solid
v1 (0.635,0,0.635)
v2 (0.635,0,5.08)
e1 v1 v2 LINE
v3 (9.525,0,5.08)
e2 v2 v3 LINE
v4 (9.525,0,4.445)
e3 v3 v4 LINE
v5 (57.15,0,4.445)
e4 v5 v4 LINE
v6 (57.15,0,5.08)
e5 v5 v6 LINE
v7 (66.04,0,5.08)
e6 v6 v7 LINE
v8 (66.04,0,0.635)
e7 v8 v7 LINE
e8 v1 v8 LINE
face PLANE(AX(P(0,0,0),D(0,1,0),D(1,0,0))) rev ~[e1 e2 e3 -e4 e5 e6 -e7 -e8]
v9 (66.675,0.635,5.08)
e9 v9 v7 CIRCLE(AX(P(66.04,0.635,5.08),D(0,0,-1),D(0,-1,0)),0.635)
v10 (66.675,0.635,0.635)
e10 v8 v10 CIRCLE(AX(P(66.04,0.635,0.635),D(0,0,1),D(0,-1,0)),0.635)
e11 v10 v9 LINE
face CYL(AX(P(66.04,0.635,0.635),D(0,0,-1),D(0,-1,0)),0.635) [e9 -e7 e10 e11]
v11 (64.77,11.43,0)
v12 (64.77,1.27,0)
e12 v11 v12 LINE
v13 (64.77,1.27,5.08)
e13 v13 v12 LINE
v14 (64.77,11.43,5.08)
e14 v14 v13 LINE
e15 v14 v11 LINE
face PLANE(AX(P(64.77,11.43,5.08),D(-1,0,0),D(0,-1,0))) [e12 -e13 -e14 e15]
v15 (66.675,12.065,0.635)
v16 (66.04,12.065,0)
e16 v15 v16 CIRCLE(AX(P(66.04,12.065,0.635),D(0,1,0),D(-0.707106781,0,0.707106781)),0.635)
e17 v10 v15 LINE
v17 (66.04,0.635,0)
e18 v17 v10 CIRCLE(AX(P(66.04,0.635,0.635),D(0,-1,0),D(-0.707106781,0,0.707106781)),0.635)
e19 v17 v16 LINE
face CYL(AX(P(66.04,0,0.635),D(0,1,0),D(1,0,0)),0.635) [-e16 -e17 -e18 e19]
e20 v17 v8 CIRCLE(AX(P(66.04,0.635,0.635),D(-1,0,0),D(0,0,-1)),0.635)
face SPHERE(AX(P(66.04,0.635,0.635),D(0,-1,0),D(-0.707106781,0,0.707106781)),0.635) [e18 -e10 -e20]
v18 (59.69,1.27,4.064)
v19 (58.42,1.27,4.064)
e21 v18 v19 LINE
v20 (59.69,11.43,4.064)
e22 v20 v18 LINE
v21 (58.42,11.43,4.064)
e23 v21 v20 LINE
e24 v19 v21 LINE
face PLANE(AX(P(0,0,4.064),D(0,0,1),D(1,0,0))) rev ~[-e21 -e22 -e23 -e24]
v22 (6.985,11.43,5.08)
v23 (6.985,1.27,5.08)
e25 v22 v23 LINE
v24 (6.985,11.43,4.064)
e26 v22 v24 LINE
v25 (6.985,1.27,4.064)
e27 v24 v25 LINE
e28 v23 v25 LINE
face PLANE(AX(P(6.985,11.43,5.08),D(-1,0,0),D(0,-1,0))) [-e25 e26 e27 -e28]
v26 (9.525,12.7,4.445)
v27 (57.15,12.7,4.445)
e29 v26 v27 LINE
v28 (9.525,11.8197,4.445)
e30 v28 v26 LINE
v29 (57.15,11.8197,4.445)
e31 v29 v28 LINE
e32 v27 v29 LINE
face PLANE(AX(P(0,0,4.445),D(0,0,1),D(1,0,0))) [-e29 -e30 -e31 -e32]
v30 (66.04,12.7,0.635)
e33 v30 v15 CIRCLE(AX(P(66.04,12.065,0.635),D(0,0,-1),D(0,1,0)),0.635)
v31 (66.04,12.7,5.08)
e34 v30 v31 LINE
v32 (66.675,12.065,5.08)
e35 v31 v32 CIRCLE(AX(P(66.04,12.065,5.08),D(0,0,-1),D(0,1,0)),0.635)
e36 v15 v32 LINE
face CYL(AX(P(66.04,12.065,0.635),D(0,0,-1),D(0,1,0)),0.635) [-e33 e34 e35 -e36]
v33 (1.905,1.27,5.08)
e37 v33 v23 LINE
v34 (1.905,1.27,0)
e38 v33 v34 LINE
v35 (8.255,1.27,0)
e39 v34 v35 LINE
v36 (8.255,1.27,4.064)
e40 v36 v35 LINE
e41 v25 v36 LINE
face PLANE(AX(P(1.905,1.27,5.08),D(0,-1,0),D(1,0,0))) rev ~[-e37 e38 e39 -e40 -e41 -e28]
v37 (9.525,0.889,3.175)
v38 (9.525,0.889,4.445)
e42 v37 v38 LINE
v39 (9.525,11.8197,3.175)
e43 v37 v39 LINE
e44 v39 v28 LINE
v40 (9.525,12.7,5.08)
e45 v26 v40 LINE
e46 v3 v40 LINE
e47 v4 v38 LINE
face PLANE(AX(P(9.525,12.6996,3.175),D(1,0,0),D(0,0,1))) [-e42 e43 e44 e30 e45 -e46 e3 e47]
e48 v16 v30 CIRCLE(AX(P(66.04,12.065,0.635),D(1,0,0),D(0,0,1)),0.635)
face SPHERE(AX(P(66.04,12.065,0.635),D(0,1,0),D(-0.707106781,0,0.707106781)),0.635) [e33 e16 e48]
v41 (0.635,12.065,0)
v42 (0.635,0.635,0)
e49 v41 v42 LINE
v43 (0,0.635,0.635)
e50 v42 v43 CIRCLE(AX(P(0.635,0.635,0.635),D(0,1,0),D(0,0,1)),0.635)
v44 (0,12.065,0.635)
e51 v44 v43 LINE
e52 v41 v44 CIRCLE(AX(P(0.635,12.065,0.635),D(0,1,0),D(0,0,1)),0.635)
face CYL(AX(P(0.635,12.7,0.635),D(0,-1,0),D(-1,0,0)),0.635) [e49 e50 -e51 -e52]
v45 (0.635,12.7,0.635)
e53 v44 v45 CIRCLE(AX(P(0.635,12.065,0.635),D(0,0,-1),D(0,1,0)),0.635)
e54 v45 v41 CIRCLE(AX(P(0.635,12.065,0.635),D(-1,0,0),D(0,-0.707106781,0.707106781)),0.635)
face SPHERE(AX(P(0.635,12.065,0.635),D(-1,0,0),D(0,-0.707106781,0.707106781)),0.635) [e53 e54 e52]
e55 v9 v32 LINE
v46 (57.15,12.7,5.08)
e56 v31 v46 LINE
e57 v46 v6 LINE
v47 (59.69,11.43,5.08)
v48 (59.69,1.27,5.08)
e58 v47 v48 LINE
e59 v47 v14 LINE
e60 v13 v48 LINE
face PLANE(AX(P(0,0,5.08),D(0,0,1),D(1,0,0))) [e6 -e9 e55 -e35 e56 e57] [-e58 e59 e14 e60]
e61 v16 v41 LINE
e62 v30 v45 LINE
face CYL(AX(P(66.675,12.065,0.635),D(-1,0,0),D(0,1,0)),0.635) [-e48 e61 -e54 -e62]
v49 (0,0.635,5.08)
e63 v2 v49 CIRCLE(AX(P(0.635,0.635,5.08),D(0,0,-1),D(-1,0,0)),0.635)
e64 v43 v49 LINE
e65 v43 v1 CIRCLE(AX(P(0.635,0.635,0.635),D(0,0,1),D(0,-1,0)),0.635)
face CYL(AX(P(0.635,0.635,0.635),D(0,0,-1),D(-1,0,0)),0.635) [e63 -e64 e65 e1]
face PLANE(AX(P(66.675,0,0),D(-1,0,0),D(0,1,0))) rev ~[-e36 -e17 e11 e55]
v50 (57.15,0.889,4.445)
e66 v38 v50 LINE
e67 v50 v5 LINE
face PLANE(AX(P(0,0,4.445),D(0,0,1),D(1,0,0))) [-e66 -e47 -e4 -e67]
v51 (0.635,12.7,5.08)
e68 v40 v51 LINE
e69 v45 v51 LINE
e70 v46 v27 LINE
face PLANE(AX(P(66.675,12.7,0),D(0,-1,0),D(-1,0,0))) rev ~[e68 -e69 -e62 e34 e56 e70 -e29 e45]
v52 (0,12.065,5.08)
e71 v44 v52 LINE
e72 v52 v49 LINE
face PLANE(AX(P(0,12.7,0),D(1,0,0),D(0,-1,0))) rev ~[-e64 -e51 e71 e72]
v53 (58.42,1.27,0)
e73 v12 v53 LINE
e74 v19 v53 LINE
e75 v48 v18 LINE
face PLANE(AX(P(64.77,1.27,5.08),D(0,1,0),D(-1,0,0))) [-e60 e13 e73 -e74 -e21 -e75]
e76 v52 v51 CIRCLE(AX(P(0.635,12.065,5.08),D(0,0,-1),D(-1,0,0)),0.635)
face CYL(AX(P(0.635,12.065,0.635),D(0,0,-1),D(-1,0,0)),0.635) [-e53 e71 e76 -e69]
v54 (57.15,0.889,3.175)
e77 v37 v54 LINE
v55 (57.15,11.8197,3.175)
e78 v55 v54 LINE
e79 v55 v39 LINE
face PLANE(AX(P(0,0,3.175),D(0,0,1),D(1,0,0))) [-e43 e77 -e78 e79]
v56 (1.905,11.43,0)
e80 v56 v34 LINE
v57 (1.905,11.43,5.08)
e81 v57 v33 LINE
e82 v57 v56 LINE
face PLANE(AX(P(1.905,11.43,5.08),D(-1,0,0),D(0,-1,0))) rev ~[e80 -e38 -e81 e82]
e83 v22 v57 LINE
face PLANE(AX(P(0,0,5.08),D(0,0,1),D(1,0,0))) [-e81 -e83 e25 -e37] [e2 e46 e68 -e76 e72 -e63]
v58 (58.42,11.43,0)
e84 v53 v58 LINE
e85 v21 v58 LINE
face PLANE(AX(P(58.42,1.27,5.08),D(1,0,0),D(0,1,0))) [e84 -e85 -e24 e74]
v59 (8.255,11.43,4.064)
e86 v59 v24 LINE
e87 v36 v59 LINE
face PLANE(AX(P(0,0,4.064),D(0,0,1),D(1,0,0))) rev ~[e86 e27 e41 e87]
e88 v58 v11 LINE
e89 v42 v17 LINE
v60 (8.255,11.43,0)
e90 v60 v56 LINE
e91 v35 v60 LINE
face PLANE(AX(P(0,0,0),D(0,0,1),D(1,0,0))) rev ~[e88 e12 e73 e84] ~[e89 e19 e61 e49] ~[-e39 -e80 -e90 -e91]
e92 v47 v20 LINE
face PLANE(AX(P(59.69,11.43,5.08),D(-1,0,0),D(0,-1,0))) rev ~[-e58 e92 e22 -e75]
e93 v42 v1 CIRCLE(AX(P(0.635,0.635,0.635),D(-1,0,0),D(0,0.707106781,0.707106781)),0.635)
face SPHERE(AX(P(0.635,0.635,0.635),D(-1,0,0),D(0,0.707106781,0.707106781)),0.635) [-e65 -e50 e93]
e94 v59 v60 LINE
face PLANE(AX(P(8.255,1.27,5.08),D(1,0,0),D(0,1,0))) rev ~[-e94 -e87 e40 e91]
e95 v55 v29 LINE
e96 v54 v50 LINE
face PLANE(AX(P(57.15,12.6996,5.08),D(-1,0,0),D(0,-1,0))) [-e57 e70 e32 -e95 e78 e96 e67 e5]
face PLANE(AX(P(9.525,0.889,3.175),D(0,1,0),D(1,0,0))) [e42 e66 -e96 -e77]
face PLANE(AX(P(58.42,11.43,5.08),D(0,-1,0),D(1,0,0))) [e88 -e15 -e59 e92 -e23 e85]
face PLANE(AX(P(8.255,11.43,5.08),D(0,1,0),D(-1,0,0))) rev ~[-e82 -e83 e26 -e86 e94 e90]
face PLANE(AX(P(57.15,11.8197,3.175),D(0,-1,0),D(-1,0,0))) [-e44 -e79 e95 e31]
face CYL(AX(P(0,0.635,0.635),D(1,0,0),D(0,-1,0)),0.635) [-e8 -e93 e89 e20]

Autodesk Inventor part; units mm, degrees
ref_plane "YZ Plane" through (0, 0, 0) normal (1, 0, 0) x (0, 1, 0)
ref_plane "XZ Plane" through (0, 0, 0) normal (0, 1, 0) x (-1, 0, 0)
ref_plane "XY Plane" through (0, 0, 0) normal (0, 0, 1) x (1, 0, 0)
sketch "Sketch1" plane through (0, 0, 0) normal (0, 0, 1) x (1, 0, 0)
  line L0 (0, 0) -> (66.675, 0)
  line L1 (66.675, 0) -> (66.675, 12.7)
  line L2 (66.675, 12.7) -> (0, 12.7)
  line L3 (0, 12.7) -> (0, 0)
  dimension "d0" = 66.675
  dimension "d1" = 12.7
extrude "Extrusion1" add sketch "Sketch1" along normal blind 5.08
fillet "Fillet1" radius 0.635 4 edges at (33.3375, 12.7, 0) (66.675, 6.35, 0) (33.3375, 0, 0) (0, 6.35, 0)
fillet "Fillet2" radius 0.635 8 edges at (66.489, 12.514, 0.186) (66.675, 12.7, 2.8575) (66.489, 0.186, 0.186) (66.675, 0, 2.8575) (0.186, 12.514, 0.186) (0, 12.7, 2.8575) (0.186, 0.186, 0.186) (0, 0, 2.8575)
sketch "Sketch2" plane through (0, 0, 5.08) normal (0, 0, 1) x (1, 0, 0)
  line L0 (9.525, 12.6996) -> (57.15, 12.6996)
  line L1 (57.15, 12.6996) -> (57.15, -0.0004)
  line L2 (57.15, -0.0004) -> (9.525, -0.0004)
  line L3 (9.525, -0.0004) -> (9.525, 12.6996)
  line L4 (66.675, 0.635) -> (66.675, 12.065) projected
  point P0 (0, 0)
  dimension "d6" = 47.625
  dimension "d7" = 12.7
  dimension "d8" = 9.525
extrude "Extrusion2" cut sketch "Sketch2" against normal blind 1.905
sketch "Sketch3" plane through (9.525, 12.6996, 5.08) normal (0, -1, 0) x (1, 0, 0)
  line L0 (0, -1.905) -> (0, 0) projected
  line L1 (47.625, -1.905) -> (0, -1.905) projected
  line L2 (0, 0) -> (47.625, 0)
  line L3 (47.625, 0) -> (47.625, -1.905)
  line L4 (47.625, -1.905) -> (0, -1.905)
  line L5 (0, -1.905) -> (0, 0)
  point P0 (-9.525, -5.08)
extrude "Extrusion3" cut sketch "Sketch3" against normal blind 0.635
sketch "Sketch4" plane through (0, 0, 5.08) normal (0, 0, 1) x (1, 0, 0)
  line L0 (0.635, 0.635) -> (66.04, 0.635) projected
  line L1 (58.42, 11.43) -> (59.69, 11.43)
  line L2 (59.69, 11.43) -> (59.69, 1.27)
  line L3 (59.69, 1.27) -> (58.42, 1.27)
  line L4 (58.42, 1.27) -> (58.42, 11.43)
  line L5 (66.04, 12.7) -> (0.635, 12.7) projected
  line L6 (57.15, 12.7) -> (57.15, 0) projected
  line L7 (57.15, 0) -> (66.04, 0) projected
  point P0 (0, 0)
  point P1 (53.975, 6.9846)
  dimension "d13" = 1.27
  dimension "d23" = 1.27
  dimension "d24" = 1.27
  dimension "d42" = 1.27
sketch "Sketch5" plane through (0, 0, 5.08) normal (0, 0, 1) x (1, 0, 0)
  line L0 (66.04, 12.065) -> (0.635, 12.065) projected
  line L1 (0.635, 0.635) -> (66.04, 0.635) projected
  line L2 (58.42, 11.43) -> (64.77, 11.43)
  line L3 (64.77, 11.43) -> (64.77, 1.27)
  line L4 (64.77, 1.27) -> (58.42, 1.27)
  line L5 (58.42, 1.27) -> (58.42, 11.43)
  line L6 (57.15, 12.7) -> (57.15, 0) projected
  line L7 (66.04, 12.7) -> (57.15, 12.7) projected
  line L8 (57.15, 0) -> (66.04, 0) projected
  point P0 (0, 0)
  point P1 (53.975, 6.9846)
  dimension "d14" = 6.35
  dimension "d25" = 1.27
  dimension "d43" = 1.27
  dimension "d44" = 1.27
extrude "Extrusion4" cut sketch "Sketch5" against normal through all
extrude "Extrusion5" add sketch "Sketch4" against normal blind 1.016
sketch "Sketch6" plane through (0, 0, 5.08) normal (0, 0, 1) x (1, 0, 0)
  line L0 (57.15, 12.7) -> (57.15, 0) projected
  line L1 (55.245, 0.635) -> (55.245, 12.065) projected
  line L2 (66.04, 12.065) -> (0.635, 12.065) projected
  line L3 (8.255, 11.43) -> (6.985, 11.43)
  line L4 (6.985, 11.43) -> (6.985, 1.27)
  line L5 (6.985, 1.27) -> (8.255, 1.27)
  line L6 (8.255, 1.27) -> (8.255, 11.43)
  line L7 (9.525, 0) -> (9.525, 12.7) projected
  line L8 (0.635, 0.635) -> (66.04, 0.635) projected
  line L9 (9.525, 12.7) -> (0.635, 12.7) projected
  line L10 (0.635, 0) -> (9.525, 0) projected
  point P0 (0, 0)
  point P1 (53.975, 6.9846)
  point P2 (6.35, 6.9846)
  dimension "d20" = 1.27
  dimension "d22" = 1.27
  dimension "d45" = 1.27
  dimension "d46" = 1.27
sketch "Sketch7" plane through (0, 0, 5.08) normal (0, 0, 1) x (1, 0, 0)
  line L0 (66.04, 12.065) -> (0.635, 12.065) projected
  line L1 (8.255, 11.43) -> (1.905, 11.43)
  line L2 (1.905, 11.43) -> (1.905, 1.27)
  line L3 (1.905, 1.27) -> (8.255, 1.27)
  line L4 (8.255, 1.27) -> (8.255, 11.43)
  line L5 (9.525, 0) -> (9.525, 12.7) projected
  line L6 (0.635, 0.635) -> (66.04, 0.635) projected
  line L7 (9.525, 12.7) -> (0.635, 12.7) projected
  line L8 (0.635, 0) -> (9.525, 0) projected
  point P0 (0, 0)
  point P1 (55.245, 12.065)
  point P2 (6.35, 6.9846)
  point P3 (55.245, 0.635)
  dimension "d26" = 6.35
  dimension "d28" = 1.27
  dimension "d47" = 1.27
  dimension "d48" = 1.27
extrude "Extrusion6" cut sketch "Sketch7" against normal through all
extrude "Extrusion7" add sketch "Sketch6" against normal blind 1.016 contours L6 L5 L4 L3
sketch "Sketch9" plane through (0, 0, 3.175) normal (0, 0, 1) x (1, 0, 0)
  line L0 (9.525, 0) -> (9.525, 12.7) projected
  line L1 (57.15, 12.7) -> (57.15, 0) projected
  line L2 (9.525, 12.7) -> (57.15, 12.7)
  line L3 (57.15, 12.7) -> (57.15, 11.8197)
  line L4 (57.15, 11.8197) -> (9.525, 11.8197)
  line L5 (9.525, 11.8197) -> (9.525, 12.7)
  line L6 (66.04, 0) -> (0.635, 0) projected
  line L7 (57.15, 0) -> (9.525, 0)
  line L8 (9.525, 0) -> (9.525, 0.889)
  line L9 (9.525, 0.889) -> (57.15, 0.889)
  line L10 (57.15, 0.889) -> (57.15, 0)
  point P0 (0, 0)
  point P1 (6.35, 6.9846)
  point P2 (53.975, 6.9846)
  dimension "d35" = 47.625
  dimension "d36" = 0.889
extrude "Extrusion8" add sketch "Sketch9" along normal blind 1.27 contours L0 L9 L1 L6 | L0 L2 L1 L4
properties part number "clipFemale"
